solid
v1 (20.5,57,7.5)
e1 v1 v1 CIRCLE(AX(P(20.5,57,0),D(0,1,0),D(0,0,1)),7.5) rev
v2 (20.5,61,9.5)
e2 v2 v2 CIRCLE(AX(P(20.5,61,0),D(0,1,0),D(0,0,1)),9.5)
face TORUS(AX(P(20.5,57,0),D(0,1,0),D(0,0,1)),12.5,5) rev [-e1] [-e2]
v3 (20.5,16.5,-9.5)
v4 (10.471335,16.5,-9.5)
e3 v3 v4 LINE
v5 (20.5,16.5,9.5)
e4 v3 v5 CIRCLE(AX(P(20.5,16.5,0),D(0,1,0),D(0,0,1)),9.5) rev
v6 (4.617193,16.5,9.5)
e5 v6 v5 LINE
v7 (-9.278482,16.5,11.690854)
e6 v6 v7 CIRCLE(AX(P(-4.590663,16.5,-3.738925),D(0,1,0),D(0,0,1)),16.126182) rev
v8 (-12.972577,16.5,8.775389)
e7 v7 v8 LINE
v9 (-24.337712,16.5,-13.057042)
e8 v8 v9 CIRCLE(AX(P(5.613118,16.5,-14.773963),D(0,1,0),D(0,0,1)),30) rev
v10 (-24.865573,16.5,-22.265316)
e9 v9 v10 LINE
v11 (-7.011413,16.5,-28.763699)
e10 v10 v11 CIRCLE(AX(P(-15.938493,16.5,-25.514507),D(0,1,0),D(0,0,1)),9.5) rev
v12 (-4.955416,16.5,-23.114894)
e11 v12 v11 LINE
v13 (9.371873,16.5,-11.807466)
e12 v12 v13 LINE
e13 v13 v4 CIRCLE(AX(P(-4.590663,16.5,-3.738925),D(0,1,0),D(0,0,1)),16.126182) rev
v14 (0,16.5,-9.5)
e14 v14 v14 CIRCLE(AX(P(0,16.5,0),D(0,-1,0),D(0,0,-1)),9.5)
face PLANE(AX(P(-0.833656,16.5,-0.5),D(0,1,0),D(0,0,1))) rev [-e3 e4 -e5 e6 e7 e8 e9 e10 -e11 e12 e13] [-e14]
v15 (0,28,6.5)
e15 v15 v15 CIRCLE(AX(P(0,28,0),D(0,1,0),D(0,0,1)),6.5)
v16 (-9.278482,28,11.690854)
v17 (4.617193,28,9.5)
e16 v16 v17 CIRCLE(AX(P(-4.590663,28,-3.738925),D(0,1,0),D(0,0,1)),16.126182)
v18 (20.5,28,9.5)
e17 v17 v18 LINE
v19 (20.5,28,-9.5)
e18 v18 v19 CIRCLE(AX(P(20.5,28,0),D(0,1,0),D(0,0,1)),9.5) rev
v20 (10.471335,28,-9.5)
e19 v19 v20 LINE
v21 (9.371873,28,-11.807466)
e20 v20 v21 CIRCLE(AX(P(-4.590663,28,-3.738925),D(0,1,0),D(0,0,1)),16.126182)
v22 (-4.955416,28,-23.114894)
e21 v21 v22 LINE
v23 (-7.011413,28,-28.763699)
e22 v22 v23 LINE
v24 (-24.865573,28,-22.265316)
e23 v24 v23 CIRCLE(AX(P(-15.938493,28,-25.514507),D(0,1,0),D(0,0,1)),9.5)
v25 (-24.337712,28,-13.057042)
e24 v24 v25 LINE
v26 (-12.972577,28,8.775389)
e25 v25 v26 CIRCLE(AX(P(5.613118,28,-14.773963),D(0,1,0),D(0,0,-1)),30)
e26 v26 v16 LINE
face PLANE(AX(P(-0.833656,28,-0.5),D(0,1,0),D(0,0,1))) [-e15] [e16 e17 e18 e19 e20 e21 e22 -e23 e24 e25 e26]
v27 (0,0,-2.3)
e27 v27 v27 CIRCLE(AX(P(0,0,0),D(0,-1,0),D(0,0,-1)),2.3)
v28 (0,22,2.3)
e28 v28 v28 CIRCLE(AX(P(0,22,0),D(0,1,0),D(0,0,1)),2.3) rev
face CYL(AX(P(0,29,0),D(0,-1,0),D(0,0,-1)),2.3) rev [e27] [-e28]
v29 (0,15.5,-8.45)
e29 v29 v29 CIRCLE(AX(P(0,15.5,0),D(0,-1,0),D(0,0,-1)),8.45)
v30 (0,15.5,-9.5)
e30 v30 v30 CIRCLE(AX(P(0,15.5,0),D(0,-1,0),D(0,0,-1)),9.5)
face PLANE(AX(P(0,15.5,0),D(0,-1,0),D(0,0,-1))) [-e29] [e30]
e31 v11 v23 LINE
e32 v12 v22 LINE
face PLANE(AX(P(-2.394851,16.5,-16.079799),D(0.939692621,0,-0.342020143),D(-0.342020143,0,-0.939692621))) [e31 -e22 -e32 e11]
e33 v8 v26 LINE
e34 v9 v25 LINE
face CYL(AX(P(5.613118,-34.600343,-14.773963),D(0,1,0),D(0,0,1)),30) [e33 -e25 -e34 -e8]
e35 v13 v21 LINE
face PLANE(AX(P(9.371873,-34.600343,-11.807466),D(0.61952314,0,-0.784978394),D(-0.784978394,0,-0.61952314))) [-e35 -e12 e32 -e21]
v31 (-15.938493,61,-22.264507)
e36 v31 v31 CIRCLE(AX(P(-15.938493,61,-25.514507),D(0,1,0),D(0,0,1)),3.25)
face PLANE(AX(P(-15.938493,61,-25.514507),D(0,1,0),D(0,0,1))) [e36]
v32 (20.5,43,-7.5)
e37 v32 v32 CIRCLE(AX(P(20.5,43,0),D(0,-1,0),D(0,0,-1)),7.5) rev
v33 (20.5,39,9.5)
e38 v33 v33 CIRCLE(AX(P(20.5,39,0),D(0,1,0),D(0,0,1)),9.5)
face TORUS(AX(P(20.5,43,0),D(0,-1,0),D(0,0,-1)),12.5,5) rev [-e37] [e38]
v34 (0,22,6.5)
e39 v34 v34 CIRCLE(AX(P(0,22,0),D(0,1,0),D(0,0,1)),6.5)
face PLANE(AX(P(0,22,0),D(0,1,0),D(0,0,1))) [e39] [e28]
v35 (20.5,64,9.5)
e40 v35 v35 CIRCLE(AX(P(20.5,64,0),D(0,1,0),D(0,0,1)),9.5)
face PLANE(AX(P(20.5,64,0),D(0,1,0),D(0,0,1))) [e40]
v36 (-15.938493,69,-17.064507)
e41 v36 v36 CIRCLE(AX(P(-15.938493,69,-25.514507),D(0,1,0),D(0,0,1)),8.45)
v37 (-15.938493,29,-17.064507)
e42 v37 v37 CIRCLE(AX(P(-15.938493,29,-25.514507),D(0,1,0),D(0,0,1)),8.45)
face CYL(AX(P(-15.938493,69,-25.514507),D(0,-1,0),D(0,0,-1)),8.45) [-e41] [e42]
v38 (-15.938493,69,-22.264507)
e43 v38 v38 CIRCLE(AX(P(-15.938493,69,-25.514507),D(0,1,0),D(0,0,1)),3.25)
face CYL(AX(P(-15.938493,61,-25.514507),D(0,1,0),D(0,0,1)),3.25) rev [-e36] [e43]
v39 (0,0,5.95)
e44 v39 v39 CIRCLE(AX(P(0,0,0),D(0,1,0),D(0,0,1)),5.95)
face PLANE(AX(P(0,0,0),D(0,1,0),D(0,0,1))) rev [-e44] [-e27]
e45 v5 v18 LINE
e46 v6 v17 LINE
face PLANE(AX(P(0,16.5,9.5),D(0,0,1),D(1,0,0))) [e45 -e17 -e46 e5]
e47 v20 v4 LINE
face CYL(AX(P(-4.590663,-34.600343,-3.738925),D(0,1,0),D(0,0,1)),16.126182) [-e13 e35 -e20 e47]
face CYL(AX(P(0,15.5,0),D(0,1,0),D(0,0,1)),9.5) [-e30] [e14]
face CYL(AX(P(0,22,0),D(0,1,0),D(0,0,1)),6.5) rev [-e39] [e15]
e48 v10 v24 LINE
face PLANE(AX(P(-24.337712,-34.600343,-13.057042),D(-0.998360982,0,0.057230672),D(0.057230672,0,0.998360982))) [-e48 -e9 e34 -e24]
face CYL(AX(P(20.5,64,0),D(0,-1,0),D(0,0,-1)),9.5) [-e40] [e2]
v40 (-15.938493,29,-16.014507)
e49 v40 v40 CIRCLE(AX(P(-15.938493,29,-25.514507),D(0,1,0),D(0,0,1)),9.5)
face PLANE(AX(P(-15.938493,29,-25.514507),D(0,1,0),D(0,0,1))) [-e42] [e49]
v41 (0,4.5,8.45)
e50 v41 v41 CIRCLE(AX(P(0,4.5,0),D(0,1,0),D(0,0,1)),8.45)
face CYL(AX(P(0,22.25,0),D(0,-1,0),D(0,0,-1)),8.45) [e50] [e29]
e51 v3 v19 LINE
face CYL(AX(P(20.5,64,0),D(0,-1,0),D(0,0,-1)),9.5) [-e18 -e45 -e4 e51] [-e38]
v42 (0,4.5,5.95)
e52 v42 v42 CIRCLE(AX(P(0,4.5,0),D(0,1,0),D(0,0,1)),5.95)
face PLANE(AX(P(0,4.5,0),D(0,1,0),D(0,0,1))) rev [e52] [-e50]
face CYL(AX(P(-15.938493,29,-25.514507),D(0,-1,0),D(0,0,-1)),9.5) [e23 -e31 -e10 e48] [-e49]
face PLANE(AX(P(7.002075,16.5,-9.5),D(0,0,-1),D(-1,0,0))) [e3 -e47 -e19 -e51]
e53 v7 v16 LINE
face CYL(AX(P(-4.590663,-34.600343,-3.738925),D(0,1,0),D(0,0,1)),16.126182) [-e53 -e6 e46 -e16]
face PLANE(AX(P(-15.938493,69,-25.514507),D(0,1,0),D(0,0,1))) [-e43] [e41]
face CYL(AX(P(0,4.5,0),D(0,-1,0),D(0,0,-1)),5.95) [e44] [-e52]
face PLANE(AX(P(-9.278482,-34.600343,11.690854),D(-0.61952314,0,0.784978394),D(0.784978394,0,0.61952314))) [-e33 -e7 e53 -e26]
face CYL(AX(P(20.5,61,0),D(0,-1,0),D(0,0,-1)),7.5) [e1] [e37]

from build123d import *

# Parameters (mm, degrees)
SKETCH_1_R           = 5.95
EXTRUDE_1_DEPTH      = 4.5
SKETCH_4_R           = 8.45
EXTRUDE_4_DEPTH      = 17.75
EXTRUDE_6_DEPTH      = 5.75
EXTRUDE_6_DEPTH_BACK = 5.75
SKETCH_12_R          = 9.5
EXTRUDE_10_DEPTH     = 1
SKETCH_7_R           = 2.3
CUT_EXTRUDE_1_DEPTH  = 57.22806055
SKETCH_8_R           = 6.5
CUT_EXTRUDE_2_DEPTH  = 6
SKETCH_9_R           = 9.5
EXTRUDE_7_DEPTH      = 36
SKETCH_10_R          = 8.45
EXTRUDE_8_DEPTH      = 40
EXTRUDE_START        = 1
SKETCH_13_R          = 9.5
SKETCH_13_R_2        = 2.3
EXTRUDE_11_DEPTH     = 1
SKETCH_14_R          = 3.25
CUT_EXTRUDE_3_DEPTH  = 8
CUT_EXTRUDE_START    = -18
CUT_EXTRUDE_4_DEPTH  = 18
CUT_EXTRUDE_START_2  = 11
SKETCH_16_R          = 14.956390748
SKETCH_16_R_2        = 7.5
CUT_EXTRUDE_5_DEPTH  = 22
FILLET_2_R           = 5
SKETCH_17_R          = 7.5
EXTRUDE_12_DEPTH     = 11.5


with BuildPart() as part:
    # Эскиз1 → Бобышка-Вытянуть1 (new body)
    with BuildSketch(Plane(origin=(0, 0, 0), x_dir=(1, 0, 0), z_dir=(0, 1, 0))):
        with Locations(Location((0, 0, 0), (0, 0, 270))):
            Circle(SKETCH_1_R)
    extrude(amount=EXTRUDE_1_DEPTH)

    # Эскиз4 → Бобышка-Вытянуть4 (add)
    with BuildSketch(Plane(origin=(0, 4.5, 0), x_dir=(1, 0, 0), z_dir=(0, 1, 0))):
        with Locations(Location((0, 0, 0), (0, 0, 270))):
            Circle(SKETCH_4_R)
    extrude(amount=EXTRUDE_4_DEPTH)

    # Эскиз6 → Бобышка-Вытянуть6 (add, two sides: drawn at the far end of the back side and taken through both)
    with BuildSketch(Plane(origin=(0, 22.25, 0), x_dir=(1, 0, 0), z_dir=(0, 1, 0)).offset(-EXTRUDE_6_DEPTH_BACK)):
        with BuildLine():
            Line((0, -9.5), (-0.833655922, -9.5))
            ThreePointArc((-0.833655922, -9.5), (-3.331132848, -9.18310947), (-5.670324417, -8.252521801))
            ThreePointArc((-5.670324417, -8.252521801), (-13.556905273, -2.05094269), (-19.066851837, 6.333461279))
            Line((-19.066851837, 6.333461279), (-28.114764095, 31.1923959))
            Line((-28.114764095, 31.1923959), (-10.2606043, 37.690778624))
            Line((-10.2606043, 37.690778624), (-2.394850826, 16.079798567))
            ThreePointArc((-2.394850826, 16.079798567), (1.266311019, 11.308479557), (7.002075382, 9.5))
            Line((7.002075382, 9.5), (30, 9.5))
            Line((30, 9.5), (30, -9.5))
            Line((30, -9.5), (0, -9.5))
        make_face()
    extrude(amount=EXTRUDE_6_DEPTH + EXTRUDE_6_DEPTH_BACK)

    # Эскиз12 → Бобышка-Вытянуть10 (add)
    with BuildSketch(Plane(origin=(0, 28, 0), x_dir=(1, 0, 0), z_dir=(0, 1, 0))):
        with Locations(Location((-15.938492836, 25.514507365, 0), (0, 0, 110))):
            Circle(SKETCH_12_R)
    extrude(amount=EXTRUDE_10_DEPTH)

    # Эскиз7 → Вырез-Вытянуть1 (cut, through all)
    with BuildSketch(Plane.XZ):
        with Locations(Location((0, 0, 0), (0, 0, 270))):
            Circle(SKETCH_7_R)
    extrude(amount=-CUT_EXTRUDE_1_DEPTH, mode=Mode.SUBTRACT)

    # Эскиз8 → Вырез-Вытянуть2 (cut)
    with BuildSketch(Plane(origin=(0, 28, 0), x_dir=(1, 0, 0), z_dir=(0, 1, 0))):
        with Locations(Location((0, 0, 0), (0, 0, 270))):
            Circle(SKETCH_8_R)
    extrude(amount=-CUT_EXTRUDE_2_DEPTH, mode=Mode.SUBTRACT)

    # Эскиз9 → Бобышка-Вытянуть7 (add)
    with BuildSketch(Plane.XZ.offset(-28)):
        with Locations(Location((20.5, 0, 0), (0, 0, 90))):
            Circle(SKETCH_9_R)
    extrude(amount=-EXTRUDE_7_DEPTH)

    # Эскиз10 → Бобышка-Вытянуть8 (add)
    with BuildSketch(Plane(origin=(0, 29, 0), x_dir=(1, 0, 0), z_dir=(0, 1, 0))):
        with Locations(Location((-15.938492836, 25.514507365, 0), (0, 0, 270))):
            Circle(SKETCH_10_R)
    extrude(amount=EXTRUDE_8_DEPTH)

    # Эскиз13 → Бобышка-Вытянуть11 (add)
    with BuildSketch(Plane.XZ.offset(-16.5).offset(EXTRUDE_START)):
        with Locations(Location((0, 0, 0), (0, 0, 90))):
            Circle(SKETCH_13_R)
        with Locations(Location((0, 0, 0), (0, 0, 270))):
            Circle(SKETCH_13_R_2, mode=Mode.SUBTRACT)
    extrude(amount=-EXTRUDE_11_DEPTH)

    # Эскиз14 → Вырез-Вытянуть3 (cut)
    with BuildSketch(Plane(origin=(0, 69, 0), x_dir=(1, 0, 0), z_dir=(0, 1, 0))):
        with Locations(Location((-15.938492836, 25.514507365, 0), (0, 0, 270))):
            Circle(SKETCH_14_R)
    extrude(amount=-CUT_EXTRUDE_3_DEPTH, mode=Mode.SUBTRACT)

    # Эскиз15 → Вырез-Вытянуть4 (cut)
    with BuildSketch(Plane(origin=(0, 28, 0), x_dir=(1, 0, 0), z_dir=(0, 1, 0)).offset(CUT_EXTRUDE_START)):
        with BuildLine():
            Line((-24.865572733, 22.265316003), (-35.336248809, 21.155444764))
            Line((-35.336248809, 21.155444764), (-35.336248809, 37.040132254))
            Line((-35.336248809, 37.040132254), (1.913807819, 42.427920993))
            Line((1.913807819, 42.427920993), (-7.011412938, 28.763698726))
            ThreePointArc((-7.011412938, 28.763698726), (-19.187684197, 34.441587262), (-24.865572733, 22.265316003))
        make_face()
        with BuildLine():
            Line((20.5, 9.5), (21.51421168, 16.603692208))
            Line((21.51421168, 16.603692208), (46.391879719, 13.051846104))
            Line((46.391879719, 13.051846104), (43.436938274, -14.794111134))
            Line((43.436938274, -14.794111134), (20.5, -14.236753678))
            Line((20.5, -14.236753678), (20.5, -9.5))
            ThreePointArc((20.5, -9.5), (30, 0), (20.5, 9.5))
        make_face()
    extrude(amount=CUT_EXTRUDE_4_DEPTH, mode=Mode.SUBTRACT)

    # Эскиз16 → Вырез-Вытянуть5 (cut)
    with BuildSketch(Plane(origin=(0, 28, 0), x_dir=(1, 0, 0), z_dir=(0, 1, 0)).offset(CUT_EXTRUDE_START_2)):
        with Locations((20.5, 0)):
            Circle(SKETCH_16_R)
        with Locations(Location((20.5, 0, 0), (0, 0, 270))):
            Circle(SKETCH_16_R_2, mode=Mode.SUBTRACT)
    extrude(amount=CUT_EXTRUDE_5_DEPTH, mode=Mode.SUBTRACT)

    # Скругление2
    # the kernel refuses this fillet: 5 mm, written as the material it adds along each edge
    with BuildSketch(Plane(origin=(20.5, 39, 0), x_dir=(0, 0, 1), z_dir=(-1, 0, 0))) as fillet_2_piece_1:
        with BuildLine():
            CenterArc((12.5, 4), FILLET_2_R, 180, 53.130102354)
            Line((7.5, 4), (7.4, 4))
            Line((7.4, 4), (7.4, 0))
            Line((7.4, 0), (7.5, -0.1))
            ThreePointArc((7.5, -0.1), (8.5, -0.1), (9.44, -0.08))
            Line((9.44, -0.08), (9.5, 0))
        make_face()
    revolve(axis=Axis((20.5, 39, 0), (0, 1, 0)))
    with BuildSketch(Plane(origin=(20.5, 61, 0), x_dir=(0, 0, 1), z_dir=(-1, 0, 0))) as fillet_2_piece_2:
        with BuildLine():
            CenterArc((12.5, -4), FILLET_2_R, 126.869897646, 53.130102354)
            Line((9.5, 0), (9.44, 0.08))
            ThreePointArc((9.44, 0.08), (8.5, 0.1), (7.5, 0.1))
            Line((7.5, 0.1), (7.4, 0))
            Line((7.4, 0), (7.4, -4))
            Line((7.4, -4), (7.5, -4))
        make_face()
    revolve(axis=Axis((20.5, 61, 0), (0, 1, 0)))

    # Эскиз17 → Бобышка-Вытянуть12 (add)
    with BuildSketch(Plane(origin=(0, 28, 0), x_dir=(1, 0, 0), z_dir=(0, 1, 0))):
        with BuildLine():
            Line((-9.278482036, -11.69085434), (-12.972576627, -8.775389277))
            ThreePointArc((-12.972576627, -8.775389277), (-20.997261978, 0.921608959), (-24.337711873, 13.057042378))
            Line((-24.337711873, 13.057042378), (-24.865572733, 22.265316003))
            Line((-24.865572733, 22.265316003), (-5.413533881, 23.476451416))
            Line((-5.413533881, 23.476451416), (9.371872764, 11.807465836))
            ThreePointArc((9.371872764, 11.807465836), (8.040562687, -6.286337643), (-9.278482036, -11.69085434))
        make_face()
        Circle(SKETCH_17_R, mode=Mode.SUBTRACT)
    extrude(amount=-EXTRUDE_12_DEPTH)


solid = part.part
